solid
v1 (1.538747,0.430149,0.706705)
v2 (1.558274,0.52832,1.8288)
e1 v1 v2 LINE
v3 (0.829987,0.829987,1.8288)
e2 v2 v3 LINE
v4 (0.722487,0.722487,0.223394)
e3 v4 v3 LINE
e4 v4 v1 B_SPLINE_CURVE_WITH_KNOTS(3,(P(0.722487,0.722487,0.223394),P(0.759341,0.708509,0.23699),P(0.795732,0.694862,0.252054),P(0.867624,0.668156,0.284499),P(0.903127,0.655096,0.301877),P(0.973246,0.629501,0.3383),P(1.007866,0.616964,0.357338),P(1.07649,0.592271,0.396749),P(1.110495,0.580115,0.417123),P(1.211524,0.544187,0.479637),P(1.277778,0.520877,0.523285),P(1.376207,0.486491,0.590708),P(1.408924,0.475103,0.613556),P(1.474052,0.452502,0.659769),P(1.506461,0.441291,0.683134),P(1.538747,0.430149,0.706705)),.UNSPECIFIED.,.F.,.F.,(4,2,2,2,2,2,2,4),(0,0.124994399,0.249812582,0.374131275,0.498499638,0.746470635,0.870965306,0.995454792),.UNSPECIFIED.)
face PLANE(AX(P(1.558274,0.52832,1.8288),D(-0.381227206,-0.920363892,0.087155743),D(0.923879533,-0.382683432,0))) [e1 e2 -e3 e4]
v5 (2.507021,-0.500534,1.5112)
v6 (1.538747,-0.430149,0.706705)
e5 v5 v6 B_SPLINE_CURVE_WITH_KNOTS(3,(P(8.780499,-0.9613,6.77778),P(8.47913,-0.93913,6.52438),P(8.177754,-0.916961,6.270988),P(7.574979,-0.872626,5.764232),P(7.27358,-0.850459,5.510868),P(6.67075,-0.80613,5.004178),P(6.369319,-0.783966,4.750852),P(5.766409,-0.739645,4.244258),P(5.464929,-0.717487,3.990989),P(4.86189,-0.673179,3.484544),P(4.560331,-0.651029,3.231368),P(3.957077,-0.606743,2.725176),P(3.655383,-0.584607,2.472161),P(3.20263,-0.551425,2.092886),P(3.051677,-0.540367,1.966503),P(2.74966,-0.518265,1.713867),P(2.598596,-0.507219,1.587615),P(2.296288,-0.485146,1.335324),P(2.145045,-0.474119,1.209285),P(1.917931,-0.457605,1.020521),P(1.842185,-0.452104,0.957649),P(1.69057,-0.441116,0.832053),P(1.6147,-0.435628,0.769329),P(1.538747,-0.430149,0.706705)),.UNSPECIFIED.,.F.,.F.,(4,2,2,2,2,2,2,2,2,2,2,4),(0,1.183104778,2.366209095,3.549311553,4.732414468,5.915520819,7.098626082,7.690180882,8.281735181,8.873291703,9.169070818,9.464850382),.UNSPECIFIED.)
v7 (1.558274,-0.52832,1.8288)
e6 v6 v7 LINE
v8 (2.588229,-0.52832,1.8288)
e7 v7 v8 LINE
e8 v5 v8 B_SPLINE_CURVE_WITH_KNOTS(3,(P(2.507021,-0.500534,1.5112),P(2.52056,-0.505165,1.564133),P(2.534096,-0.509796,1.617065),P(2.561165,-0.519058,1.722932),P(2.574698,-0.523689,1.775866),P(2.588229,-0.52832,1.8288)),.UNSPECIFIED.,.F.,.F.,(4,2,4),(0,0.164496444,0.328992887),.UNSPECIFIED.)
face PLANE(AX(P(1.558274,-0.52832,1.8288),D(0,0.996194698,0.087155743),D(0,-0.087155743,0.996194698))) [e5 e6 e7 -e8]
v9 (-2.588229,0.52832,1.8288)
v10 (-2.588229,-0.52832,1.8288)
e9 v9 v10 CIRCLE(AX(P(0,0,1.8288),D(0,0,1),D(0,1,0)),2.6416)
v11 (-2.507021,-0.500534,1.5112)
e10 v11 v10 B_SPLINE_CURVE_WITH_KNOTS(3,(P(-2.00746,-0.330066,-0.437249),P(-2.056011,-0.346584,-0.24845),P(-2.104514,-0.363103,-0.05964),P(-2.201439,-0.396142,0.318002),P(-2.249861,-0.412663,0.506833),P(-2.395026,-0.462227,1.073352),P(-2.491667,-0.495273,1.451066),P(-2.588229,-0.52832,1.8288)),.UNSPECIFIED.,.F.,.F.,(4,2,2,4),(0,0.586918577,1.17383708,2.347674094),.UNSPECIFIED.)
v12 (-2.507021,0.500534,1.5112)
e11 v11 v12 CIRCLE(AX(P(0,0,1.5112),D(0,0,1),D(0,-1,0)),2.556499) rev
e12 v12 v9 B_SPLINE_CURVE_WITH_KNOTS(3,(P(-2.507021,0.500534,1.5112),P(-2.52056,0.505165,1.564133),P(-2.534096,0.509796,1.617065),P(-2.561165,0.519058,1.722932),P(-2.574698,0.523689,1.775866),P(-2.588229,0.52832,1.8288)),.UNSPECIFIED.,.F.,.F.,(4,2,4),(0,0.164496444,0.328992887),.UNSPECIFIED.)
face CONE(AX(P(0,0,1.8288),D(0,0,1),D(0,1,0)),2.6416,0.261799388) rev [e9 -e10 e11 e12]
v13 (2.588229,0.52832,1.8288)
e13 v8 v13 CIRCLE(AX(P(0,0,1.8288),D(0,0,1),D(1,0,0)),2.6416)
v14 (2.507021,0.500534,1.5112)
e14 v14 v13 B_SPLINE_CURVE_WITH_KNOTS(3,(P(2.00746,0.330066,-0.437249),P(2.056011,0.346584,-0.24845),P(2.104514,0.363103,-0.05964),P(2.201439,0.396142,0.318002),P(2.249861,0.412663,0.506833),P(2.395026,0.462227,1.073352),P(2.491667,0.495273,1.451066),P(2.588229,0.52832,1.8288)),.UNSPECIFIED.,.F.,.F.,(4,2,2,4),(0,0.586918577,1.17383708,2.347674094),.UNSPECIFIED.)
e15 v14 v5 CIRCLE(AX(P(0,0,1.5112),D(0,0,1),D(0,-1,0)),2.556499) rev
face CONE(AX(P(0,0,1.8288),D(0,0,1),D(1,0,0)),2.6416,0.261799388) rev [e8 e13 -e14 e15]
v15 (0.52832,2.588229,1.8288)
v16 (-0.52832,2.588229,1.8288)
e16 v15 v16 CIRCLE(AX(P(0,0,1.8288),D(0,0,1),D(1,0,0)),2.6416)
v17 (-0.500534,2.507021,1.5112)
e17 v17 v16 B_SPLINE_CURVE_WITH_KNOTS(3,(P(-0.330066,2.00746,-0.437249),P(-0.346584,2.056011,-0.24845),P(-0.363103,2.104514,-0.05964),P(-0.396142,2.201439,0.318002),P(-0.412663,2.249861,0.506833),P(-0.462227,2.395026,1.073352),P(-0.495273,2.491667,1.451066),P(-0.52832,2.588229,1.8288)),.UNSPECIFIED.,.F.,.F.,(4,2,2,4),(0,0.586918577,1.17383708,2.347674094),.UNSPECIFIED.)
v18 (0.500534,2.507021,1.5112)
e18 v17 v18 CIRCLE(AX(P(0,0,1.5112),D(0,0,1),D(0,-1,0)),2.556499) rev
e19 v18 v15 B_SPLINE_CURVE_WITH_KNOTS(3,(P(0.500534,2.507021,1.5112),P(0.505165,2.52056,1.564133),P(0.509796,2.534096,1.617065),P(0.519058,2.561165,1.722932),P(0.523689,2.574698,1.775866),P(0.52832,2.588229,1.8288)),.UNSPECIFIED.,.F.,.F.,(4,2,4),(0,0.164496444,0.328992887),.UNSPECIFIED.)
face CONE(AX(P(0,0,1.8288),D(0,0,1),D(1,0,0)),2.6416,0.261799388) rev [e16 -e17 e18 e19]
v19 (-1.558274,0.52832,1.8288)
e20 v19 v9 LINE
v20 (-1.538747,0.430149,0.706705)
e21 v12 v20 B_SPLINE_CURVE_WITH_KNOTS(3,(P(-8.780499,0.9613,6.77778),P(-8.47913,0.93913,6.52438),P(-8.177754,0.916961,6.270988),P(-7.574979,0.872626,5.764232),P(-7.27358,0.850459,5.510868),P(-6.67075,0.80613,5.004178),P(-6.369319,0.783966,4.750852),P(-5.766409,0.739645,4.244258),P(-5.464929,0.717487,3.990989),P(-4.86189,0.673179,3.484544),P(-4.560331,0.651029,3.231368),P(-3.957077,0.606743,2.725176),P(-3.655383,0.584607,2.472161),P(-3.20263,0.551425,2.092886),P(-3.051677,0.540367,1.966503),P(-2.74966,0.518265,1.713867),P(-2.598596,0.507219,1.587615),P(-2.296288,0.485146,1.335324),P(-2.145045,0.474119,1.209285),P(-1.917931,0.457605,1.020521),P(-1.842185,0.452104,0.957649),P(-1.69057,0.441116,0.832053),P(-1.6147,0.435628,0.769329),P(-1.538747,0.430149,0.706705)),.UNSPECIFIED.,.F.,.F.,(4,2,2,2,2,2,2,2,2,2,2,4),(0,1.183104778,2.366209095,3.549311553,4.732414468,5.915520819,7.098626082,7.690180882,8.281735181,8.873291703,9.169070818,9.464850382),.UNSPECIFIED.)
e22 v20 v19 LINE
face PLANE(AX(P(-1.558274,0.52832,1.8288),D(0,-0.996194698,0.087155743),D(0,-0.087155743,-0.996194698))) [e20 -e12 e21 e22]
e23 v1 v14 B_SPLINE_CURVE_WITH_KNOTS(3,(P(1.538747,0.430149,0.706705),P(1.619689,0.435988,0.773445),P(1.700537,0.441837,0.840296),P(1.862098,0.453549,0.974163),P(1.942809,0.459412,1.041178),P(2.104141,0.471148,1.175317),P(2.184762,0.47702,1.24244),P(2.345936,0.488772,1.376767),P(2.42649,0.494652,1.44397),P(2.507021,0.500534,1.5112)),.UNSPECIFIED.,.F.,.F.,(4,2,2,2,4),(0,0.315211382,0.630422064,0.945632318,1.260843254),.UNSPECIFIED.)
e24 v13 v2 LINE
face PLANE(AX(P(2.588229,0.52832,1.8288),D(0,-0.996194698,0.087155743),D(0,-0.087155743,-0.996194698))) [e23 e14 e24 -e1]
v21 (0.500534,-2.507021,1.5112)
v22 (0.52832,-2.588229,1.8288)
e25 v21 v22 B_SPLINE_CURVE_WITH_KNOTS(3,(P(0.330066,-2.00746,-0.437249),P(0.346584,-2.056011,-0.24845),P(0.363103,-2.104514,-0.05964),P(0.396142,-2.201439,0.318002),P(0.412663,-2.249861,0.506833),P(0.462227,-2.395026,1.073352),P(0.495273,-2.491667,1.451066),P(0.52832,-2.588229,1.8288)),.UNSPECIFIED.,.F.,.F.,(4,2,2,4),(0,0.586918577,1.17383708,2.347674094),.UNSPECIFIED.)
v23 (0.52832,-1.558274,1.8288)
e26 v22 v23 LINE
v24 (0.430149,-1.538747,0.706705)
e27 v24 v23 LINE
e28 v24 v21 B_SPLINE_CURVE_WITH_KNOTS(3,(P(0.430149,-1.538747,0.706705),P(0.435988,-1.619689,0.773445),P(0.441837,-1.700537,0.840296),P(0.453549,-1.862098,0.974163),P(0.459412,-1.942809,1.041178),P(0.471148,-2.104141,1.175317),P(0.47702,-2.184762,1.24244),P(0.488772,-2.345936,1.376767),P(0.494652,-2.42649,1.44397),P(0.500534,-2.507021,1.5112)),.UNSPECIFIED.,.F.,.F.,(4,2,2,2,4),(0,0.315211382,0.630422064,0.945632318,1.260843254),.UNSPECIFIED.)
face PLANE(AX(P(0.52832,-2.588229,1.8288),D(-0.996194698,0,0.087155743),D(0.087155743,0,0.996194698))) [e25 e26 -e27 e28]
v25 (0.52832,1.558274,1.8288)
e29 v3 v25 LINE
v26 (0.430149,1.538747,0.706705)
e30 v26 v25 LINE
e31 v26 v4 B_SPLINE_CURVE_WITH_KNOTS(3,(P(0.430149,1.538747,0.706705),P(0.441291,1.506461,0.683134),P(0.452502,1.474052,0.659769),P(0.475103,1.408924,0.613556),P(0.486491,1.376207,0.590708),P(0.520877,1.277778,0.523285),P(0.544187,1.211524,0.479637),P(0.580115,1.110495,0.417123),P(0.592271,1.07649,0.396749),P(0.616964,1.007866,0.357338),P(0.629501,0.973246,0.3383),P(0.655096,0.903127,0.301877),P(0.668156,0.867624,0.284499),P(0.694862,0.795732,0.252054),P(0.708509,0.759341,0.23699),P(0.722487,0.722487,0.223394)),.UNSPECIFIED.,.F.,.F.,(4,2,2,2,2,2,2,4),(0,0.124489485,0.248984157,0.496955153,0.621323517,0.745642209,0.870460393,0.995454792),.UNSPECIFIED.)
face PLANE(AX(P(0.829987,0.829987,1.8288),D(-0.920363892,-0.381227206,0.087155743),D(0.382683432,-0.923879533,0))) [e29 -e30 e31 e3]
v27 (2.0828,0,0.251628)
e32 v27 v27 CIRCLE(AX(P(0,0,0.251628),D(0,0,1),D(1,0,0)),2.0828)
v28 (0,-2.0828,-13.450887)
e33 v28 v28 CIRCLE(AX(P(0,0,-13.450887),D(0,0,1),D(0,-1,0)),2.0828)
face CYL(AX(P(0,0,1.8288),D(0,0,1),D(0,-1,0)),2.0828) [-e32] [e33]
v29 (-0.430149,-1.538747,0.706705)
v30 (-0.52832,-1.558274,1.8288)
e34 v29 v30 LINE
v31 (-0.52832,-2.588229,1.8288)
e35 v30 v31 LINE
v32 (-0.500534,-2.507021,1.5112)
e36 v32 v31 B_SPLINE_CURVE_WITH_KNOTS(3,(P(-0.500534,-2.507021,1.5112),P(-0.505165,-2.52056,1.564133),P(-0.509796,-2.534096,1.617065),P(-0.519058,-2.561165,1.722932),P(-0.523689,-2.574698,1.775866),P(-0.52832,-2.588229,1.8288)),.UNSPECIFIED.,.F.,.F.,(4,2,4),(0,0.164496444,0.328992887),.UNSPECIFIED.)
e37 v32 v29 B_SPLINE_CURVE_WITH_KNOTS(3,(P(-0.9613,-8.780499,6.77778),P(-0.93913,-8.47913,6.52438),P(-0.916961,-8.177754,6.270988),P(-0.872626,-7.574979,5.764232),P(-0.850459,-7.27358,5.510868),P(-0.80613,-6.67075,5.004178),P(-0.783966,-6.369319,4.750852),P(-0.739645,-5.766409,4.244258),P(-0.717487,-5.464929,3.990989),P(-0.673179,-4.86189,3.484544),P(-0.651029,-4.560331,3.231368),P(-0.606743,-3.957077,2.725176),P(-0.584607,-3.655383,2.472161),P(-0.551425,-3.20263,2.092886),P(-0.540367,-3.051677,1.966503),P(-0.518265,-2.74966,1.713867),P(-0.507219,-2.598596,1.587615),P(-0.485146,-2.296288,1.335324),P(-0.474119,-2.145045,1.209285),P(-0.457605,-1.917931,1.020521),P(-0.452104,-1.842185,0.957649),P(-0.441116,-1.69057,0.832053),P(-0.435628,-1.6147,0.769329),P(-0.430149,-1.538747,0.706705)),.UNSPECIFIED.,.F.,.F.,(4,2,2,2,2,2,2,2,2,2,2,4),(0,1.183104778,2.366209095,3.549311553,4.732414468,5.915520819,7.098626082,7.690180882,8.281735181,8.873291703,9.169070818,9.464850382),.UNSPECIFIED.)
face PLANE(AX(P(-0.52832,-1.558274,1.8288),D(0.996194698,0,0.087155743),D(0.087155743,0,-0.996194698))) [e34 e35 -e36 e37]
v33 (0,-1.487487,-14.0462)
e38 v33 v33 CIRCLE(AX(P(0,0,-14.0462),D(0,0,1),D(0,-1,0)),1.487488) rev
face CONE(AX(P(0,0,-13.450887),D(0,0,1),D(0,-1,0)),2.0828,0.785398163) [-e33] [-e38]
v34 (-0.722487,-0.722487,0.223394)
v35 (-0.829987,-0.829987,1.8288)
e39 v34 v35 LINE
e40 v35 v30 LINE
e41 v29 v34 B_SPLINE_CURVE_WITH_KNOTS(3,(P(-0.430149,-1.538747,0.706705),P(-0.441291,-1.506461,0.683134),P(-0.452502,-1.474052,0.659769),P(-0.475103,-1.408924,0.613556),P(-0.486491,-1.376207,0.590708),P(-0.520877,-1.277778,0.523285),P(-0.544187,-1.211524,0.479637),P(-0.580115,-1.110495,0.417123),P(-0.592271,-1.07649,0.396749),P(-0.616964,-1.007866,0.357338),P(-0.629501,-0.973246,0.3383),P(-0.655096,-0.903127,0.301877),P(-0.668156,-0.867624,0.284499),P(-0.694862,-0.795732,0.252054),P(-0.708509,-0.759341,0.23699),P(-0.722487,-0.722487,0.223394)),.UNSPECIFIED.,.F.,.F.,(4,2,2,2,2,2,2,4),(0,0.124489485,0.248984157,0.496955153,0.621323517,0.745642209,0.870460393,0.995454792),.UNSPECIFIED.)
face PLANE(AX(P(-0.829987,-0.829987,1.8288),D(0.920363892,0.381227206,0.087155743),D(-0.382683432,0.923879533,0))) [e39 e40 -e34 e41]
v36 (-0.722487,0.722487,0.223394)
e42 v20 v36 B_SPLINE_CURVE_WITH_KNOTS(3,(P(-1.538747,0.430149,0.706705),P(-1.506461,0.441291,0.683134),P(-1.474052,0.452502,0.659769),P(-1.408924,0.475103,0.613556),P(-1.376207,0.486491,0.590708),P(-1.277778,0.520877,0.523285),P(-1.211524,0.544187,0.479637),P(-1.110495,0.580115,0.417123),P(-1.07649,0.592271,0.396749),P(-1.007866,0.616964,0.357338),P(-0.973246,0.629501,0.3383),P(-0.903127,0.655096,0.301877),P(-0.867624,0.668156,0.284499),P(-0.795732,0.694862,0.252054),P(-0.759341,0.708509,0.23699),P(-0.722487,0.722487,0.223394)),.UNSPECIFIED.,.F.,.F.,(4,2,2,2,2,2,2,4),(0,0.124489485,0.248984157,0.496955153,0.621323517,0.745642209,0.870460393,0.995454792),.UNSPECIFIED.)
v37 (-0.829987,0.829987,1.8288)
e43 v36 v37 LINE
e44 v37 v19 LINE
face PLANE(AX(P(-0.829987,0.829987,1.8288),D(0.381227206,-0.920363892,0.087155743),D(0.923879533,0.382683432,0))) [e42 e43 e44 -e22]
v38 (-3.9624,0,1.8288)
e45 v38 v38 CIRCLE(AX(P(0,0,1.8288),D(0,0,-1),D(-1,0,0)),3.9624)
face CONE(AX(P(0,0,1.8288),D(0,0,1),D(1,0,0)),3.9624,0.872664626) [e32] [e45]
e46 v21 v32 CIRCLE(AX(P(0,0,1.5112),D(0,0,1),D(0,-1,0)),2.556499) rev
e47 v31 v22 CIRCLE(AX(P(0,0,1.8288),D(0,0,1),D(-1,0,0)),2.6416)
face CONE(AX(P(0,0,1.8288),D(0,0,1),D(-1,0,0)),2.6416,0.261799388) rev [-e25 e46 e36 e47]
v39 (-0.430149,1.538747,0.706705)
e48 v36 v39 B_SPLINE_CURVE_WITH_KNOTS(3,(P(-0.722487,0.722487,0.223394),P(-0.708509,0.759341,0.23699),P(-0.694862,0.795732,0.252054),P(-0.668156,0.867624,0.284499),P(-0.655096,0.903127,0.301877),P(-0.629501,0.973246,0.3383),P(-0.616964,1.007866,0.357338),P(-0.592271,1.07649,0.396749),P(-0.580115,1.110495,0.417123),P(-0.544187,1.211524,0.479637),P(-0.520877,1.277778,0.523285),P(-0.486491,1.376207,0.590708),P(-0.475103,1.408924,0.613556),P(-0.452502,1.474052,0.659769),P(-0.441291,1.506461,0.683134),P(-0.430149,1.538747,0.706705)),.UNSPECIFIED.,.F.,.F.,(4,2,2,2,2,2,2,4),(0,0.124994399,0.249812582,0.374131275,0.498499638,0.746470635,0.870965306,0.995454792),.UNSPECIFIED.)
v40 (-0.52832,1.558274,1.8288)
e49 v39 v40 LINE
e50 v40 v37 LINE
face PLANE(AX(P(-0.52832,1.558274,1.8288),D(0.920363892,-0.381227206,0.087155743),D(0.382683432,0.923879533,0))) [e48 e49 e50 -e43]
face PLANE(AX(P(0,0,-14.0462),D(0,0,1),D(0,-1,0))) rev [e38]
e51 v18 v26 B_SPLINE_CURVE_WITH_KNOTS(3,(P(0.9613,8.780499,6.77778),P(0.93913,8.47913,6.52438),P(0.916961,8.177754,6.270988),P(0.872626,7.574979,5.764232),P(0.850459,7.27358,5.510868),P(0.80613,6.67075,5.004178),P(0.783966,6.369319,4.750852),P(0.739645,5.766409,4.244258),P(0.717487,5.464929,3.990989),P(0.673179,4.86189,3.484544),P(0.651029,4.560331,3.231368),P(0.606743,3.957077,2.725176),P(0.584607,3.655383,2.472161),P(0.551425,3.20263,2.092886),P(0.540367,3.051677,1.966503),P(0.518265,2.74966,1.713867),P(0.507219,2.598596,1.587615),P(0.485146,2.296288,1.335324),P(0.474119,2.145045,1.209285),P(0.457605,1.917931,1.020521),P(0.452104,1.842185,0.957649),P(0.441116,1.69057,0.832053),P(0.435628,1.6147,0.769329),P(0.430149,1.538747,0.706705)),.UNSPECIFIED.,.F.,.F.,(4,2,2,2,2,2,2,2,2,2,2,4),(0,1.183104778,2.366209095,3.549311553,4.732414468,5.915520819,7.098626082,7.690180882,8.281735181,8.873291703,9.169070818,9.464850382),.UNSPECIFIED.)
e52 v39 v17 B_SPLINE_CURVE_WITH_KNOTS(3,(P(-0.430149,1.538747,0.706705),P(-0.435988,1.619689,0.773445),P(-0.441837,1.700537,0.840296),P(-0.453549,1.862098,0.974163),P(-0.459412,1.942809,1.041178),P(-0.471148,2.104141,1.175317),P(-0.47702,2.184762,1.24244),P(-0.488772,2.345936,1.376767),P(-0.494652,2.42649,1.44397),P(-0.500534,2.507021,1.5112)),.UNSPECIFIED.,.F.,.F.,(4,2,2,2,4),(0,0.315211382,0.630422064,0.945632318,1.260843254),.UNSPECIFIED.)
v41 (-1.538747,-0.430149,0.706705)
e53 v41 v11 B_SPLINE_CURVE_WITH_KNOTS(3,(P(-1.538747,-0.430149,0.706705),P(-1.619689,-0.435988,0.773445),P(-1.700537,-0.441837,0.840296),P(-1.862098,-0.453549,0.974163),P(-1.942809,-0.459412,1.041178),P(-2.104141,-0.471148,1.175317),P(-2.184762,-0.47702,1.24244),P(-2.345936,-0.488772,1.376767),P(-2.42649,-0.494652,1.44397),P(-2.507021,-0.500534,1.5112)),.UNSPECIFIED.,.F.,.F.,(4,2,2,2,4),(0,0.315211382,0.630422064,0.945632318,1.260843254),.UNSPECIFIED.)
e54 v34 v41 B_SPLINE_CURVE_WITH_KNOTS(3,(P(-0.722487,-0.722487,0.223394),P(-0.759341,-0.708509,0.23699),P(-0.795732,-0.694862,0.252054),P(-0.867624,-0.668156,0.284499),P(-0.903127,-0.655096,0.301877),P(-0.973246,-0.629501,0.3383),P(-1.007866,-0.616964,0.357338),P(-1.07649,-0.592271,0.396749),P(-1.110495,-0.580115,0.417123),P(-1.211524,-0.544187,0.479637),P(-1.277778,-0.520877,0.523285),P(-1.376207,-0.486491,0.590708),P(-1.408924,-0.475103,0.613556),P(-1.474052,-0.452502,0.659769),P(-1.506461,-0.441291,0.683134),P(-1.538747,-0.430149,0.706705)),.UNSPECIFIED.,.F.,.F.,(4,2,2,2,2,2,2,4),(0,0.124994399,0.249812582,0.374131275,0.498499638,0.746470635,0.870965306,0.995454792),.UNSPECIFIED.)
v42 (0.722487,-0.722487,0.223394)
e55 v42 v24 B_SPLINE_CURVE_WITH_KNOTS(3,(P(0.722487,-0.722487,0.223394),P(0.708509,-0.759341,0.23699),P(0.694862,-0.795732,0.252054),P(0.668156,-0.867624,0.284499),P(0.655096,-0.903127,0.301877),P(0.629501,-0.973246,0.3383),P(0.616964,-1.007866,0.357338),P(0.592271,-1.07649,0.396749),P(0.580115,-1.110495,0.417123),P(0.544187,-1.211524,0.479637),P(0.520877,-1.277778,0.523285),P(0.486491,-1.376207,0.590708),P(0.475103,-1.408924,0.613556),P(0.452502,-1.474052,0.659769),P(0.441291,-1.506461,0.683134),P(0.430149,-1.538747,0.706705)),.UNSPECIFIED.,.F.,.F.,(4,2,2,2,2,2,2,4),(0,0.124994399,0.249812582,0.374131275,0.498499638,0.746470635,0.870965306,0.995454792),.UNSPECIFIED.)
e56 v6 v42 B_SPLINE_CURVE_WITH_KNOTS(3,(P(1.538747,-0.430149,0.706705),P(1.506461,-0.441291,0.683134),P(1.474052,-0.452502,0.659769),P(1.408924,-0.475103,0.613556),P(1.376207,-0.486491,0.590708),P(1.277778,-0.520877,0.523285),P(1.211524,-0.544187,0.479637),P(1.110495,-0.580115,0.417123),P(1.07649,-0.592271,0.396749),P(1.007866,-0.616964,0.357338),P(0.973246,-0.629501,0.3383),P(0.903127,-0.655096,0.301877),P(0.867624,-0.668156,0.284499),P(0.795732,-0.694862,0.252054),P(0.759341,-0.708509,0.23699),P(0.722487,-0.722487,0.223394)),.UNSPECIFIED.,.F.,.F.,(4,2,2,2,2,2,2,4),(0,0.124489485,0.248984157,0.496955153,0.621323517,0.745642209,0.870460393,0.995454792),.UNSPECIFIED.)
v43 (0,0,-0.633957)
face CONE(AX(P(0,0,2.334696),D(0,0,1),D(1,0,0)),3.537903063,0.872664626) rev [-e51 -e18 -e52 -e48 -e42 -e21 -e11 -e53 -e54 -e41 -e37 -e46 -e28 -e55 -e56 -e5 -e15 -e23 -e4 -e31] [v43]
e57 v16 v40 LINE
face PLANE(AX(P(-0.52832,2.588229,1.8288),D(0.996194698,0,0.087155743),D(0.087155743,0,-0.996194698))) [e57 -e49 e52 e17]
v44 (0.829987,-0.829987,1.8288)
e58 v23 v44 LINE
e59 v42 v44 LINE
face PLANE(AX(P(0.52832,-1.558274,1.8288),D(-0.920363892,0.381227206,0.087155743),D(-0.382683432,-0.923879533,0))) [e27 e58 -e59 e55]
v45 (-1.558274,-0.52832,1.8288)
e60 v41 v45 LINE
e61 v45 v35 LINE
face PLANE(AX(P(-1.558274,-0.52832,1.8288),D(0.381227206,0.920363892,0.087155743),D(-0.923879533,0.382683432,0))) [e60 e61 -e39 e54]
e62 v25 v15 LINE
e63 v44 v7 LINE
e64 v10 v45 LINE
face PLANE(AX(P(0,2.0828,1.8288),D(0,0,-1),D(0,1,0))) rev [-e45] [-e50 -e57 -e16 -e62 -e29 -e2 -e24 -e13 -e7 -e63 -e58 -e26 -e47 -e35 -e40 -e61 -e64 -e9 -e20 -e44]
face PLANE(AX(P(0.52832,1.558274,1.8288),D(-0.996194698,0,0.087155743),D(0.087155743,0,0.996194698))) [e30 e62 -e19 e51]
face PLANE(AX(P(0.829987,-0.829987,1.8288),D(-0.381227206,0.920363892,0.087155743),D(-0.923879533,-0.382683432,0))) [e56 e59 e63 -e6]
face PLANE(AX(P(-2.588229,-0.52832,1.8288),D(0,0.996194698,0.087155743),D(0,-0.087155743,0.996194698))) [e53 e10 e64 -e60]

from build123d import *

# Parameters (mm, degrees)
SKETCH1_R          = 3.9624
EXTRUDE3_DEPTH     = 1.8288
SKETCH4_W          = 15.875
SKETCH4_H          = 2.0828
CHAMFER1_SIZE      = 0.5953125
SKETCH26_R         = 1.0414
EXTRUDE8_DEPTH     = 1.8288
CUT_EXTRUDE3_REACH = 18.835
CIRPATTERN1_COUNT  = 4
DRAFT2_ANGLE       = 5


# Read off the part's stored shape, not the designer's step: Extrude10, Draft1
with BuildPart() as part:
    # Sketch1 → Extrude3 (new body)
    with BuildSketch(Plane.XY):
        Circle(SKETCH1_R)
    extrude(amount=EXTRUDE3_DEPTH)

    # Sketch11 → Cut-Revolve3 (revolve, cut)
    with BuildSketch(Plane(origin=(0, 0, 0), x_dir=(0, 0, -1), z_dir=(1, 0, 0)), mode=Mode.PRIVATE) as cut_revolve3_sk:
        Polygon((0, 1.78292103), (-1.8288, 3.9624), (0, 3.9624), align=None)
    revolve(cut_revolve3_sk.sketch.rotate(Axis((0, 0, -0.441444004), (0, 0, 1)), 90), axis=Axis((0, 0, -0.441444004), (0, 0, 1)), mode=Mode.SUBTRACT)

    # Extrude10 outline → Extrude10 (revolve)
    with BuildSketch(Plane.XZ):
        Polygon((2.0828, 0), (2.0828, 0.251628333), (1.78292103, 0.251628333), (1.78292103, 0), (0, 0), (0, -2.0828), align=None)
    revolve(axis=Axis((0, 0, 0), (0, 0, 1)))



with BuildPart() as body_2:
    # Sketch4 → Revolve1 (revolve)
    with BuildSketch(Plane(origin=(0, 0, 0), x_dir=(0, 0, -1), z_dir=(1, 0, 0)), mode=Mode.PRIVATE) as revolve1_sk:
        with Locations((6.1087, 1.0414)):
            Rectangle(SKETCH4_W, SKETCH4_H)
    revolve(revolve1_sk.sketch.rotate(Axis((0, 0, 1.8288), (0, 0, -1)), 180), axis=Axis((0, 0, 1.8288), (0, 0, -1)))

    # Chamfer1
    chamfer1_edges = [body_2.edges().sort_by_distance(p)[0] for p in [
        (0, 2.0828, -14.0462),
    ]]
    chamfer(chamfer1_edges, length=CHAMFER1_SIZE)


with BuildPart() as part_1:
    add(part.part)

    add(body_2.part)  # Extrude8 merges body 2
    # Sketch26 → Extrude8 (add)
    with BuildSketch(Plane.XY.offset(1.8288)):
        Circle(SKETCH26_R)
    extrude(amount=-EXTRUDE8_DEPTH)

    # Cut-Extrude3: up to this cone (the profile starts inside it)
    cut_extrude3_end = Plane(origin=(0, 0, 1.8288), z_dir=(0, 0, 1)).offset(-2.462756405) * Cone(1.192e-06, 29.475352474, 24.732756389, align=(Align.CENTER, Align.CENTER, Align.MIN), mode=Mode.PRIVATE)
    # Sketch12 → Cut-Extrude3 (cut, up to the surface)
    with BuildSketch(Plane.XY.offset(1.8288), mode=Mode.PRIVATE) as cut_extrude3_sk1:
        with BuildLine():
            Line((2.588228842, 0.52832), (1.558274421, 0.52832))
            Line((1.558274421, 0.52832), (0.829986666, 0.829986666))
            Line((0.829986666, 0.829986666), (0.52832, 1.558274421))
            Line((0.52832, 1.558274421), (0.52832, 2.588228842))
            ThreePointArc((0.52832, 2.588228842), (0.265504474, 2.628223342), (0, 2.6416))
            Line((0, 2.6416), (0, 0))
            Line((0, 0), (2.6416, 0))
            ThreePointArc((2.6416, 0), (2.628223342, 0.265504474), (2.588228842, 0.52832))
        make_face()
    cut_extrude3_tool1 = extrude(cut_extrude3_sk1.sketch, amount=-CUT_EXTRUDE3_REACH, mode=Mode.PRIVATE) & cut_extrude3_end
    cut_extrude3 = cut_extrude3_tool1.solids().sort_by_distance((2.591055, 0.26175, 1.8288))[0]
    add(cut_extrude3, mode=Mode.SUBTRACT)

    # CirPattern1: Cut-Extrude3 ×4 about axis
    cirpattern1_axis = Axis((0, 0, 0), (0, 0, 1))
    for i in range(1, CIRPATTERN1_COUNT):
        add(cut_extrude3.rotate(cirpattern1_axis, i * 360 / CIRPATTERN1_COUNT), mode=Mode.SUBTRACT)

    # Draft1 outline → Draft1 (revolve)
    with BuildSketch(Plane.XZ):
        Polygon((2.6416, 1.8288), (2.556499421, 1.511200317), (2.6416, 1.511200317), align=None)
    revolve(axis=Axis((0, 0, 0), (0, 0, 1)))

    # Draft2
    draft2_faces = [part_1.faces().sort_by_distance(p)[0] for p in [
        (0.52832, 1.956108767, 1.448849015),
        (0.686884975, 1.175464708, 1.173602986),
        (1.175464708, 0.686884975, 1.173602986),
        (1.956108767, 0.52832, 1.448849015),
        (1.956108767, -0.52832, 1.448849015),
        (1.175464708, -0.686884975, 1.173602986),
        (0.686884975, -1.175464708, 1.173602986),
        (0.52832, -1.956108767, 1.448849015),
        (-0.52832, -1.956108767, 1.448849015),
        (-0.686884975, -1.175464708, 1.173602986),
        (-1.175464708, -0.686884975, 1.173602986),
        (-1.956108767, -0.52832, 1.448849015),
        (-1.956108767, 0.52832, 1.448849015),
        (-1.175464708, 0.686884975, 1.173602986),
        (-0.686884975, 1.175464708, 1.173602986),
        (-0.52832, 1.956108767, 1.448849015),
    ]]
    draft(draft2_faces, Plane(origin=(0, 2.0828, 1.8288), x_dir=(0, 1, 0), z_dir=(0, 0, 1)), DRAFT2_ANGLE)


solid = part_1.part
